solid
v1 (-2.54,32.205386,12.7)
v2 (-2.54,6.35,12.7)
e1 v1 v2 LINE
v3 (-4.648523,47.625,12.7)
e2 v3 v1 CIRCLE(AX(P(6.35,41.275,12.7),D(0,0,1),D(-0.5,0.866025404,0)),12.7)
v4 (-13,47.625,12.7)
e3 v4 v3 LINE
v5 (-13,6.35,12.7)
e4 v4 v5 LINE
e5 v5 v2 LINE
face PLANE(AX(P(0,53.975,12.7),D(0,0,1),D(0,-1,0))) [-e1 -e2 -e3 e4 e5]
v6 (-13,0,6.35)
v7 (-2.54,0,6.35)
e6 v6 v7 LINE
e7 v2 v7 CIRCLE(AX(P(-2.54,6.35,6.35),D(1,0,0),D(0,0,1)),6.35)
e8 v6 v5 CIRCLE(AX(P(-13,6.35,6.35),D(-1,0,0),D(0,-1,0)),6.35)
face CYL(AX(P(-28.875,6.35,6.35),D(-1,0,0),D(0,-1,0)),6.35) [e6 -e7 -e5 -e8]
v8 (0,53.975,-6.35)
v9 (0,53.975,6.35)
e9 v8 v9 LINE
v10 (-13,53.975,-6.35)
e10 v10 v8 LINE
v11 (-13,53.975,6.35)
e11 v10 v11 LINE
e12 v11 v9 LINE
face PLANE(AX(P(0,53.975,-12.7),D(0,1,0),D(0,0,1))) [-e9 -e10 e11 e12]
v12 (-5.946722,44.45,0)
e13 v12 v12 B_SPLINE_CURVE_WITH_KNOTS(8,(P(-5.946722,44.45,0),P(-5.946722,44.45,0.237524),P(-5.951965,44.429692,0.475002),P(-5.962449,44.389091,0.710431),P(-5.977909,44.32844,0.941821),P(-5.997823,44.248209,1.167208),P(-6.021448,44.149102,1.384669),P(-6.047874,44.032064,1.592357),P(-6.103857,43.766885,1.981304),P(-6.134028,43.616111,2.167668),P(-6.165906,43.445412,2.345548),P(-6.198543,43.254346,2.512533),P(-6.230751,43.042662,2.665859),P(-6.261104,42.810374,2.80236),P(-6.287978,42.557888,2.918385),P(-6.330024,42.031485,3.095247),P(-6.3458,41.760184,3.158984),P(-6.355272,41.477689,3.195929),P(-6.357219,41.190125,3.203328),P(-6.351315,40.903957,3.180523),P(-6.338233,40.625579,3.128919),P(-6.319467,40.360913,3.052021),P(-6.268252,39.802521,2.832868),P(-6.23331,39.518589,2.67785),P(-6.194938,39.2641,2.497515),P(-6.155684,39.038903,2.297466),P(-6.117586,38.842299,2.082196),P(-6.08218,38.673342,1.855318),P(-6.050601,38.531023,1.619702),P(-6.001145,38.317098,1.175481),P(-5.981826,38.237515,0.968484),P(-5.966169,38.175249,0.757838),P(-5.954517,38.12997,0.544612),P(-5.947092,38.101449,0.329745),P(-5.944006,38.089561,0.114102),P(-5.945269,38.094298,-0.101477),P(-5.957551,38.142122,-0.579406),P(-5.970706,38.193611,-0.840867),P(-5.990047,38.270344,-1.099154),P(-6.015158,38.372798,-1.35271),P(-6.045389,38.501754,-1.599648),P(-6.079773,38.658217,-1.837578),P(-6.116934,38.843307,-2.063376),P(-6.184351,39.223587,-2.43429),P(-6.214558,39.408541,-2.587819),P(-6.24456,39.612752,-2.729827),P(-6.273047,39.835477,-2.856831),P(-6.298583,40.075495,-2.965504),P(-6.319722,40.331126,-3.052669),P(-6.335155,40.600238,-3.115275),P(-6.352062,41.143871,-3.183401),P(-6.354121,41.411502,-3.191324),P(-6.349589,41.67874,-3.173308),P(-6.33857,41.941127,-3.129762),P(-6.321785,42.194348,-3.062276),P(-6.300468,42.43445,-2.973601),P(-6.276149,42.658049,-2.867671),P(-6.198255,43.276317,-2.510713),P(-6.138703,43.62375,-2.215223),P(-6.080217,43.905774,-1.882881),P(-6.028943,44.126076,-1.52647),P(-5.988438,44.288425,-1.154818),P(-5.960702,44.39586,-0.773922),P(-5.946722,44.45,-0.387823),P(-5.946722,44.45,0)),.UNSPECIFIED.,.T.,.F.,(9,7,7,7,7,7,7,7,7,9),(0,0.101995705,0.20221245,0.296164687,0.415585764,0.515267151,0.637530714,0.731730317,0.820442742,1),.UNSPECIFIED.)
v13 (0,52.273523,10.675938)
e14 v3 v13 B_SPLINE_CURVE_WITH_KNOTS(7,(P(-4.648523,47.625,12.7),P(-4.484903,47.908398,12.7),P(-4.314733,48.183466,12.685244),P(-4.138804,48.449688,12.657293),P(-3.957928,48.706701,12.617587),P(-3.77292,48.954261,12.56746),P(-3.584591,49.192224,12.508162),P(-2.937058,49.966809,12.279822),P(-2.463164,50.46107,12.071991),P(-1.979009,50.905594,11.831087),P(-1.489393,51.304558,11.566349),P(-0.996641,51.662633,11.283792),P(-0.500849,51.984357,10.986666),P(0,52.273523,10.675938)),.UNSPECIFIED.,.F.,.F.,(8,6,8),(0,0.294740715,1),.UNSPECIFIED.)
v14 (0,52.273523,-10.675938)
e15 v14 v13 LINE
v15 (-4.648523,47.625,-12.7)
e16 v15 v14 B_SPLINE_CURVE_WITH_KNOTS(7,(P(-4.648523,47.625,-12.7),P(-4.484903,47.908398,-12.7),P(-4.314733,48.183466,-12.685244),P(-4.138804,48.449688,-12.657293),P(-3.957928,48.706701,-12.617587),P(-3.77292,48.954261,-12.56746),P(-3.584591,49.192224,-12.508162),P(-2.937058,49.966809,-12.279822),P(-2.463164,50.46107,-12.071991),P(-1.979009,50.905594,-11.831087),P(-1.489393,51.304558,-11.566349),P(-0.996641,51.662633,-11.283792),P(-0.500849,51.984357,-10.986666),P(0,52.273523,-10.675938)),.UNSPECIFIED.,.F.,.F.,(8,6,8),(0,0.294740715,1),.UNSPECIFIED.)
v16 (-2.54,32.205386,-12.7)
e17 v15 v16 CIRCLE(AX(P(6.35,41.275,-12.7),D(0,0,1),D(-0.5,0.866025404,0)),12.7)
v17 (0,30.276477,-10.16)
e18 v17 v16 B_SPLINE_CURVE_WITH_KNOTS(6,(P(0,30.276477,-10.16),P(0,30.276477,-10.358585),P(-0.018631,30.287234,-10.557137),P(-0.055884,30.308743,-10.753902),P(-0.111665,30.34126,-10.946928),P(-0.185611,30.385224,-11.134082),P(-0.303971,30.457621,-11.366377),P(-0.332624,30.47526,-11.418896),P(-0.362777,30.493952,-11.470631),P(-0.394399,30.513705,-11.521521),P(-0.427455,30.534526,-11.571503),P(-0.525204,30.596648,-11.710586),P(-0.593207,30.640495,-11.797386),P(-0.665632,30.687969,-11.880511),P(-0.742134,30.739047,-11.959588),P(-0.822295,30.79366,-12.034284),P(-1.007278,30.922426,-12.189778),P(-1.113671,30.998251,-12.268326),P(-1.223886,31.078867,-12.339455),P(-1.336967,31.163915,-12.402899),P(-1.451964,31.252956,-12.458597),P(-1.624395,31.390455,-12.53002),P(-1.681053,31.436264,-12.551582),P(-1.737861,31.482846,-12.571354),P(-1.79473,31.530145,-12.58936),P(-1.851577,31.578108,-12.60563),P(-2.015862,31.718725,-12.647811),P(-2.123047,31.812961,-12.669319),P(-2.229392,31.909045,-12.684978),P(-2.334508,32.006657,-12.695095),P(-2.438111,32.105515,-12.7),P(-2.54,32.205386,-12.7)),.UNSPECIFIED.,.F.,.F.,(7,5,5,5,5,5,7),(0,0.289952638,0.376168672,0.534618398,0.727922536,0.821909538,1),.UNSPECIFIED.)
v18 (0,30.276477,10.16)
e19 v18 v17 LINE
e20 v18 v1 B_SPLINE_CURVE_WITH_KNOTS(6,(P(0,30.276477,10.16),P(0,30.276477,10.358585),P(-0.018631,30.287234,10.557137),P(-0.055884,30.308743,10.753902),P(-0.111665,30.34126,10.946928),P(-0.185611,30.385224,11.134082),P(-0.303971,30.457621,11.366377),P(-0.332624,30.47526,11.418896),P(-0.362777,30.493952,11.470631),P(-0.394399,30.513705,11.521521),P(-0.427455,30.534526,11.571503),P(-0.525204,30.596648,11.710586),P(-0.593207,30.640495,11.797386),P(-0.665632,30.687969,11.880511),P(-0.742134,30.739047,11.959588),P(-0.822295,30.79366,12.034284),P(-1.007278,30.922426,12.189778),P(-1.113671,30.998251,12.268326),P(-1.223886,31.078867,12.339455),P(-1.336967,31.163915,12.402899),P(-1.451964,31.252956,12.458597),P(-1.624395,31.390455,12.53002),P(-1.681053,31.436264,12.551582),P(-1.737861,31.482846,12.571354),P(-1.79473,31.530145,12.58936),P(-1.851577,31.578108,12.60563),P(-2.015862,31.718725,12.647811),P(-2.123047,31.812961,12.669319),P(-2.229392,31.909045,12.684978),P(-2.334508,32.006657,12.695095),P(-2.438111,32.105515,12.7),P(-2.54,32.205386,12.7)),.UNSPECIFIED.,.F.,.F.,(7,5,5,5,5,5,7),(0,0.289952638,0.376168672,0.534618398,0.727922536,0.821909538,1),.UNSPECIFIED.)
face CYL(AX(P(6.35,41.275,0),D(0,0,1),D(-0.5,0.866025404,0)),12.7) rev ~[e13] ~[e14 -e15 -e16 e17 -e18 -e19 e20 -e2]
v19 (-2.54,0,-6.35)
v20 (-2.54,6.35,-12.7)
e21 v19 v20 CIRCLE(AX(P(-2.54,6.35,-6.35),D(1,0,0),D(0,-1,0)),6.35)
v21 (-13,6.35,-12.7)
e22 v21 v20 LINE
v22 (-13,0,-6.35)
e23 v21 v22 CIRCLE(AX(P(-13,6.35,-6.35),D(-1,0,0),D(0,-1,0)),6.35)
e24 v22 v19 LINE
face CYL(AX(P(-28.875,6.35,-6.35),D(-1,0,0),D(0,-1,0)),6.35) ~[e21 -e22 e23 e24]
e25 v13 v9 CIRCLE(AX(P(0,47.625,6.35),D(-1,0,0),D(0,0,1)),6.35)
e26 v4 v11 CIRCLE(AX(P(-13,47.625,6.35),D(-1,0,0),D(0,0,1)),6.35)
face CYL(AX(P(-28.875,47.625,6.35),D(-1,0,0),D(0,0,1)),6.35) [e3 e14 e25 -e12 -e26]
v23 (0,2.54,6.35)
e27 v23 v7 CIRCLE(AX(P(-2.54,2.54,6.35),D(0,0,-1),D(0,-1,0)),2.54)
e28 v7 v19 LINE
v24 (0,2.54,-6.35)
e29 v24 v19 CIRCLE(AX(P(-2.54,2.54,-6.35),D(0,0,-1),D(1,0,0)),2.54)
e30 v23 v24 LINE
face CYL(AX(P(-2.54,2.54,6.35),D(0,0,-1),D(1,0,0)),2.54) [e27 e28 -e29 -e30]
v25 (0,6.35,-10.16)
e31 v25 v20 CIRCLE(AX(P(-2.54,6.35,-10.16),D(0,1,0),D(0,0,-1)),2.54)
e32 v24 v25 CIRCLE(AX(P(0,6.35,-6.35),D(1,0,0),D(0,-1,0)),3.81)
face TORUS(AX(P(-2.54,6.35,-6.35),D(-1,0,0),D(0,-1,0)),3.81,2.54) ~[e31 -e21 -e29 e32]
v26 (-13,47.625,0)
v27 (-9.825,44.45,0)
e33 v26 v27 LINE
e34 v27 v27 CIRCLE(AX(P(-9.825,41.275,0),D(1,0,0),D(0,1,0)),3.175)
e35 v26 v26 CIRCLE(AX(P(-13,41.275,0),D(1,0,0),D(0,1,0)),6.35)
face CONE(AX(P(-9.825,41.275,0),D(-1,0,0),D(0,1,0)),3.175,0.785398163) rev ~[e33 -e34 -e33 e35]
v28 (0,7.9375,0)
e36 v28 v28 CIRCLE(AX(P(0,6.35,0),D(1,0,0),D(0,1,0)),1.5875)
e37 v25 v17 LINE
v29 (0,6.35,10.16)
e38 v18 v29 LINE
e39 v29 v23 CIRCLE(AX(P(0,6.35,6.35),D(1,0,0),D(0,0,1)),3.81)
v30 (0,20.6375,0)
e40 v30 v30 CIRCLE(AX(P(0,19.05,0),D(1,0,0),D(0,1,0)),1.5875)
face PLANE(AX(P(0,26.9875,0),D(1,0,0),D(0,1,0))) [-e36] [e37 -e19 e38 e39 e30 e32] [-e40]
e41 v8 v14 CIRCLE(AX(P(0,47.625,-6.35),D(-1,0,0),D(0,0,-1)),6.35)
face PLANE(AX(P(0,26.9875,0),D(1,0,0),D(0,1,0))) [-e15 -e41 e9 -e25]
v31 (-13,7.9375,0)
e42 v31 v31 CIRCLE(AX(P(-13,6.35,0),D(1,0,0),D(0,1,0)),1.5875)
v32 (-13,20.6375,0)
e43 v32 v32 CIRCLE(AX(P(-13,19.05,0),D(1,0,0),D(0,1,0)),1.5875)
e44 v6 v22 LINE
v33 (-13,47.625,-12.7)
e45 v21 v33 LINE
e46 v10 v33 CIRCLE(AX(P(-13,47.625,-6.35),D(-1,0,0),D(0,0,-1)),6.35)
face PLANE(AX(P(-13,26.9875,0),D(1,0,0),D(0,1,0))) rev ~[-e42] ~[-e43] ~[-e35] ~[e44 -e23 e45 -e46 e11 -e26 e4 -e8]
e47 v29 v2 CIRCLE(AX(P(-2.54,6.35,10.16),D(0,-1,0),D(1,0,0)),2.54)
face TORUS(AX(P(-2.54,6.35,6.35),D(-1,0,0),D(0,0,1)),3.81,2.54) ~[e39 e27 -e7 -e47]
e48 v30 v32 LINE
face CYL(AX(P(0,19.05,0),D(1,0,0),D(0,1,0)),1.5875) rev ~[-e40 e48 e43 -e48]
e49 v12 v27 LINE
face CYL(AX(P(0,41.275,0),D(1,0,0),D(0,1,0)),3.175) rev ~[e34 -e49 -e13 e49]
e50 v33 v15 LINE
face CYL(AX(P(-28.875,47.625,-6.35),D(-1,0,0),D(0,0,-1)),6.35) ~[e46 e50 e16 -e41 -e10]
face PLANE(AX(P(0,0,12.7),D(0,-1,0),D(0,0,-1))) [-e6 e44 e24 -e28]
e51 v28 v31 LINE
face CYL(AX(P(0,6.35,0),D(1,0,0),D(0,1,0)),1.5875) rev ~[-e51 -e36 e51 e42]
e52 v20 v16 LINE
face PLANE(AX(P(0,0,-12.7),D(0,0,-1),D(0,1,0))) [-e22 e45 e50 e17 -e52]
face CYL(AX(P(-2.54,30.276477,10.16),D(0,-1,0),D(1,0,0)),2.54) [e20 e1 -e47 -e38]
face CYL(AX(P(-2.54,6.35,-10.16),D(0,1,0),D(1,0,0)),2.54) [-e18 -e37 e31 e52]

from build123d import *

# Parameters (mm, degrees)
F0_R        = 1.5875
F0_R_2      = 3.175
F1_DEPTH    = 13
F3_DEPTH    = 37.5
F4_T1_DEPTH = 44.75
F5_R        = 2.54
F6_SIZE     = 3.175


# Not quite as in the source:
# - a fillet or chamfer that OpenCascade refuses, or shapes differently, is made with other operations: its cross-section is extruded or revolved along the edge and cut away or added
# - a feature names something its author has since deleted; it is built from what else it names


with BuildPart() as f1:
    # F0 (on Right) → F1 (new body)
    with BuildSketch(Plane.YZ):
        Polygon((0, 0), (0, -12.7), (53.975, -12.7), (53.975, 12.7), (0, 12.7), align=None)
        with Locations((6.35, 0)):
            Circle(F0_R, mode=Mode.SUBTRACT)
        with Locations((19.05, 0)):
            Circle(F0_R, mode=Mode.SUBTRACT)
        with Locations((41.275, 0)):
            Circle(F0_R_2, mode=Mode.SUBTRACT)
    extrude(amount=-F1_DEPTH)

    # F2 (on Top) → F3 (cut, symmetric)
    with BuildSketch(Plane.XY):
        with BuildLine():
            Line((0, 30.2764773719), (0, 52.2735226281))
            ThreePointArc((0, 52.2735226281), (-6.35, 41.275), (0, 30.2764773719))
        make_face()
    extrude(amount=F3_DEPTH, both=True, mode=Mode.SUBTRACT)

    # F4: fillet of radius 6.35 on 4 edges, made by hand

    # F4_s2 → F4_t1 (cut)
    with BuildSketch(Plane.YZ.offset(-28.875)):
        with BuildLine():
            ThreePointArc((0, -6.35), (1.8598719395, -10.8401280605), (6.35, -12.7))
            Line((6.35, -12.7), (0, -12.7))
            Line((0, -12.7), (0, -6.35))
        make_face()
        with BuildLine():
            ThreePointArc((0, 6.35), (1.8598719395, 10.8401280605), (6.35, 12.7))
            Line((6.35, 12.7), (0, 12.7))
            Line((0, 12.7), (0, 6.35))
        make_face()
        with BuildLine():
            ThreePointArc((47.625, -12.7), (52.1151280605, -10.8401280605), (53.975, -6.35))
            Line((53.975, -6.35), (53.975, -12.7))
            Line((53.975, -12.7), (47.625, -12.7))
        make_face()
        with BuildLine():
            ThreePointArc((47.625, 12.7), (52.1151280605, 10.8401280605), (53.975, 6.35))
            Line((53.975, 6.35), (53.975, 12.7))
            Line((53.975, 12.7), (47.625, 12.7))
        make_face()
    extrude(amount=F4_T1_DEPTH, mode=Mode.SUBTRACT)

    # F5
    f5_edges = [f1.edges().sort_by_distance(p)[0] for p in [
        (-6.5, 0, 6.35),
        (0, 0, 0),
        (0, 1.859872, -10.840128),
        (0, 1.859872, 10.840128),
        (0, 18.313239, 12.7),
        (0, 18.313239, -12.7),
    ]]
    fillet(f5_edges, radius=F5_R)

    # F6
    f6_edges = [f1.edges().sort_by_distance(p)[0] for p in [
        (-13, 38.1, 0),
    ]]
    chamfer(f6_edges, length=F6_SIZE)


solid = f1.part
